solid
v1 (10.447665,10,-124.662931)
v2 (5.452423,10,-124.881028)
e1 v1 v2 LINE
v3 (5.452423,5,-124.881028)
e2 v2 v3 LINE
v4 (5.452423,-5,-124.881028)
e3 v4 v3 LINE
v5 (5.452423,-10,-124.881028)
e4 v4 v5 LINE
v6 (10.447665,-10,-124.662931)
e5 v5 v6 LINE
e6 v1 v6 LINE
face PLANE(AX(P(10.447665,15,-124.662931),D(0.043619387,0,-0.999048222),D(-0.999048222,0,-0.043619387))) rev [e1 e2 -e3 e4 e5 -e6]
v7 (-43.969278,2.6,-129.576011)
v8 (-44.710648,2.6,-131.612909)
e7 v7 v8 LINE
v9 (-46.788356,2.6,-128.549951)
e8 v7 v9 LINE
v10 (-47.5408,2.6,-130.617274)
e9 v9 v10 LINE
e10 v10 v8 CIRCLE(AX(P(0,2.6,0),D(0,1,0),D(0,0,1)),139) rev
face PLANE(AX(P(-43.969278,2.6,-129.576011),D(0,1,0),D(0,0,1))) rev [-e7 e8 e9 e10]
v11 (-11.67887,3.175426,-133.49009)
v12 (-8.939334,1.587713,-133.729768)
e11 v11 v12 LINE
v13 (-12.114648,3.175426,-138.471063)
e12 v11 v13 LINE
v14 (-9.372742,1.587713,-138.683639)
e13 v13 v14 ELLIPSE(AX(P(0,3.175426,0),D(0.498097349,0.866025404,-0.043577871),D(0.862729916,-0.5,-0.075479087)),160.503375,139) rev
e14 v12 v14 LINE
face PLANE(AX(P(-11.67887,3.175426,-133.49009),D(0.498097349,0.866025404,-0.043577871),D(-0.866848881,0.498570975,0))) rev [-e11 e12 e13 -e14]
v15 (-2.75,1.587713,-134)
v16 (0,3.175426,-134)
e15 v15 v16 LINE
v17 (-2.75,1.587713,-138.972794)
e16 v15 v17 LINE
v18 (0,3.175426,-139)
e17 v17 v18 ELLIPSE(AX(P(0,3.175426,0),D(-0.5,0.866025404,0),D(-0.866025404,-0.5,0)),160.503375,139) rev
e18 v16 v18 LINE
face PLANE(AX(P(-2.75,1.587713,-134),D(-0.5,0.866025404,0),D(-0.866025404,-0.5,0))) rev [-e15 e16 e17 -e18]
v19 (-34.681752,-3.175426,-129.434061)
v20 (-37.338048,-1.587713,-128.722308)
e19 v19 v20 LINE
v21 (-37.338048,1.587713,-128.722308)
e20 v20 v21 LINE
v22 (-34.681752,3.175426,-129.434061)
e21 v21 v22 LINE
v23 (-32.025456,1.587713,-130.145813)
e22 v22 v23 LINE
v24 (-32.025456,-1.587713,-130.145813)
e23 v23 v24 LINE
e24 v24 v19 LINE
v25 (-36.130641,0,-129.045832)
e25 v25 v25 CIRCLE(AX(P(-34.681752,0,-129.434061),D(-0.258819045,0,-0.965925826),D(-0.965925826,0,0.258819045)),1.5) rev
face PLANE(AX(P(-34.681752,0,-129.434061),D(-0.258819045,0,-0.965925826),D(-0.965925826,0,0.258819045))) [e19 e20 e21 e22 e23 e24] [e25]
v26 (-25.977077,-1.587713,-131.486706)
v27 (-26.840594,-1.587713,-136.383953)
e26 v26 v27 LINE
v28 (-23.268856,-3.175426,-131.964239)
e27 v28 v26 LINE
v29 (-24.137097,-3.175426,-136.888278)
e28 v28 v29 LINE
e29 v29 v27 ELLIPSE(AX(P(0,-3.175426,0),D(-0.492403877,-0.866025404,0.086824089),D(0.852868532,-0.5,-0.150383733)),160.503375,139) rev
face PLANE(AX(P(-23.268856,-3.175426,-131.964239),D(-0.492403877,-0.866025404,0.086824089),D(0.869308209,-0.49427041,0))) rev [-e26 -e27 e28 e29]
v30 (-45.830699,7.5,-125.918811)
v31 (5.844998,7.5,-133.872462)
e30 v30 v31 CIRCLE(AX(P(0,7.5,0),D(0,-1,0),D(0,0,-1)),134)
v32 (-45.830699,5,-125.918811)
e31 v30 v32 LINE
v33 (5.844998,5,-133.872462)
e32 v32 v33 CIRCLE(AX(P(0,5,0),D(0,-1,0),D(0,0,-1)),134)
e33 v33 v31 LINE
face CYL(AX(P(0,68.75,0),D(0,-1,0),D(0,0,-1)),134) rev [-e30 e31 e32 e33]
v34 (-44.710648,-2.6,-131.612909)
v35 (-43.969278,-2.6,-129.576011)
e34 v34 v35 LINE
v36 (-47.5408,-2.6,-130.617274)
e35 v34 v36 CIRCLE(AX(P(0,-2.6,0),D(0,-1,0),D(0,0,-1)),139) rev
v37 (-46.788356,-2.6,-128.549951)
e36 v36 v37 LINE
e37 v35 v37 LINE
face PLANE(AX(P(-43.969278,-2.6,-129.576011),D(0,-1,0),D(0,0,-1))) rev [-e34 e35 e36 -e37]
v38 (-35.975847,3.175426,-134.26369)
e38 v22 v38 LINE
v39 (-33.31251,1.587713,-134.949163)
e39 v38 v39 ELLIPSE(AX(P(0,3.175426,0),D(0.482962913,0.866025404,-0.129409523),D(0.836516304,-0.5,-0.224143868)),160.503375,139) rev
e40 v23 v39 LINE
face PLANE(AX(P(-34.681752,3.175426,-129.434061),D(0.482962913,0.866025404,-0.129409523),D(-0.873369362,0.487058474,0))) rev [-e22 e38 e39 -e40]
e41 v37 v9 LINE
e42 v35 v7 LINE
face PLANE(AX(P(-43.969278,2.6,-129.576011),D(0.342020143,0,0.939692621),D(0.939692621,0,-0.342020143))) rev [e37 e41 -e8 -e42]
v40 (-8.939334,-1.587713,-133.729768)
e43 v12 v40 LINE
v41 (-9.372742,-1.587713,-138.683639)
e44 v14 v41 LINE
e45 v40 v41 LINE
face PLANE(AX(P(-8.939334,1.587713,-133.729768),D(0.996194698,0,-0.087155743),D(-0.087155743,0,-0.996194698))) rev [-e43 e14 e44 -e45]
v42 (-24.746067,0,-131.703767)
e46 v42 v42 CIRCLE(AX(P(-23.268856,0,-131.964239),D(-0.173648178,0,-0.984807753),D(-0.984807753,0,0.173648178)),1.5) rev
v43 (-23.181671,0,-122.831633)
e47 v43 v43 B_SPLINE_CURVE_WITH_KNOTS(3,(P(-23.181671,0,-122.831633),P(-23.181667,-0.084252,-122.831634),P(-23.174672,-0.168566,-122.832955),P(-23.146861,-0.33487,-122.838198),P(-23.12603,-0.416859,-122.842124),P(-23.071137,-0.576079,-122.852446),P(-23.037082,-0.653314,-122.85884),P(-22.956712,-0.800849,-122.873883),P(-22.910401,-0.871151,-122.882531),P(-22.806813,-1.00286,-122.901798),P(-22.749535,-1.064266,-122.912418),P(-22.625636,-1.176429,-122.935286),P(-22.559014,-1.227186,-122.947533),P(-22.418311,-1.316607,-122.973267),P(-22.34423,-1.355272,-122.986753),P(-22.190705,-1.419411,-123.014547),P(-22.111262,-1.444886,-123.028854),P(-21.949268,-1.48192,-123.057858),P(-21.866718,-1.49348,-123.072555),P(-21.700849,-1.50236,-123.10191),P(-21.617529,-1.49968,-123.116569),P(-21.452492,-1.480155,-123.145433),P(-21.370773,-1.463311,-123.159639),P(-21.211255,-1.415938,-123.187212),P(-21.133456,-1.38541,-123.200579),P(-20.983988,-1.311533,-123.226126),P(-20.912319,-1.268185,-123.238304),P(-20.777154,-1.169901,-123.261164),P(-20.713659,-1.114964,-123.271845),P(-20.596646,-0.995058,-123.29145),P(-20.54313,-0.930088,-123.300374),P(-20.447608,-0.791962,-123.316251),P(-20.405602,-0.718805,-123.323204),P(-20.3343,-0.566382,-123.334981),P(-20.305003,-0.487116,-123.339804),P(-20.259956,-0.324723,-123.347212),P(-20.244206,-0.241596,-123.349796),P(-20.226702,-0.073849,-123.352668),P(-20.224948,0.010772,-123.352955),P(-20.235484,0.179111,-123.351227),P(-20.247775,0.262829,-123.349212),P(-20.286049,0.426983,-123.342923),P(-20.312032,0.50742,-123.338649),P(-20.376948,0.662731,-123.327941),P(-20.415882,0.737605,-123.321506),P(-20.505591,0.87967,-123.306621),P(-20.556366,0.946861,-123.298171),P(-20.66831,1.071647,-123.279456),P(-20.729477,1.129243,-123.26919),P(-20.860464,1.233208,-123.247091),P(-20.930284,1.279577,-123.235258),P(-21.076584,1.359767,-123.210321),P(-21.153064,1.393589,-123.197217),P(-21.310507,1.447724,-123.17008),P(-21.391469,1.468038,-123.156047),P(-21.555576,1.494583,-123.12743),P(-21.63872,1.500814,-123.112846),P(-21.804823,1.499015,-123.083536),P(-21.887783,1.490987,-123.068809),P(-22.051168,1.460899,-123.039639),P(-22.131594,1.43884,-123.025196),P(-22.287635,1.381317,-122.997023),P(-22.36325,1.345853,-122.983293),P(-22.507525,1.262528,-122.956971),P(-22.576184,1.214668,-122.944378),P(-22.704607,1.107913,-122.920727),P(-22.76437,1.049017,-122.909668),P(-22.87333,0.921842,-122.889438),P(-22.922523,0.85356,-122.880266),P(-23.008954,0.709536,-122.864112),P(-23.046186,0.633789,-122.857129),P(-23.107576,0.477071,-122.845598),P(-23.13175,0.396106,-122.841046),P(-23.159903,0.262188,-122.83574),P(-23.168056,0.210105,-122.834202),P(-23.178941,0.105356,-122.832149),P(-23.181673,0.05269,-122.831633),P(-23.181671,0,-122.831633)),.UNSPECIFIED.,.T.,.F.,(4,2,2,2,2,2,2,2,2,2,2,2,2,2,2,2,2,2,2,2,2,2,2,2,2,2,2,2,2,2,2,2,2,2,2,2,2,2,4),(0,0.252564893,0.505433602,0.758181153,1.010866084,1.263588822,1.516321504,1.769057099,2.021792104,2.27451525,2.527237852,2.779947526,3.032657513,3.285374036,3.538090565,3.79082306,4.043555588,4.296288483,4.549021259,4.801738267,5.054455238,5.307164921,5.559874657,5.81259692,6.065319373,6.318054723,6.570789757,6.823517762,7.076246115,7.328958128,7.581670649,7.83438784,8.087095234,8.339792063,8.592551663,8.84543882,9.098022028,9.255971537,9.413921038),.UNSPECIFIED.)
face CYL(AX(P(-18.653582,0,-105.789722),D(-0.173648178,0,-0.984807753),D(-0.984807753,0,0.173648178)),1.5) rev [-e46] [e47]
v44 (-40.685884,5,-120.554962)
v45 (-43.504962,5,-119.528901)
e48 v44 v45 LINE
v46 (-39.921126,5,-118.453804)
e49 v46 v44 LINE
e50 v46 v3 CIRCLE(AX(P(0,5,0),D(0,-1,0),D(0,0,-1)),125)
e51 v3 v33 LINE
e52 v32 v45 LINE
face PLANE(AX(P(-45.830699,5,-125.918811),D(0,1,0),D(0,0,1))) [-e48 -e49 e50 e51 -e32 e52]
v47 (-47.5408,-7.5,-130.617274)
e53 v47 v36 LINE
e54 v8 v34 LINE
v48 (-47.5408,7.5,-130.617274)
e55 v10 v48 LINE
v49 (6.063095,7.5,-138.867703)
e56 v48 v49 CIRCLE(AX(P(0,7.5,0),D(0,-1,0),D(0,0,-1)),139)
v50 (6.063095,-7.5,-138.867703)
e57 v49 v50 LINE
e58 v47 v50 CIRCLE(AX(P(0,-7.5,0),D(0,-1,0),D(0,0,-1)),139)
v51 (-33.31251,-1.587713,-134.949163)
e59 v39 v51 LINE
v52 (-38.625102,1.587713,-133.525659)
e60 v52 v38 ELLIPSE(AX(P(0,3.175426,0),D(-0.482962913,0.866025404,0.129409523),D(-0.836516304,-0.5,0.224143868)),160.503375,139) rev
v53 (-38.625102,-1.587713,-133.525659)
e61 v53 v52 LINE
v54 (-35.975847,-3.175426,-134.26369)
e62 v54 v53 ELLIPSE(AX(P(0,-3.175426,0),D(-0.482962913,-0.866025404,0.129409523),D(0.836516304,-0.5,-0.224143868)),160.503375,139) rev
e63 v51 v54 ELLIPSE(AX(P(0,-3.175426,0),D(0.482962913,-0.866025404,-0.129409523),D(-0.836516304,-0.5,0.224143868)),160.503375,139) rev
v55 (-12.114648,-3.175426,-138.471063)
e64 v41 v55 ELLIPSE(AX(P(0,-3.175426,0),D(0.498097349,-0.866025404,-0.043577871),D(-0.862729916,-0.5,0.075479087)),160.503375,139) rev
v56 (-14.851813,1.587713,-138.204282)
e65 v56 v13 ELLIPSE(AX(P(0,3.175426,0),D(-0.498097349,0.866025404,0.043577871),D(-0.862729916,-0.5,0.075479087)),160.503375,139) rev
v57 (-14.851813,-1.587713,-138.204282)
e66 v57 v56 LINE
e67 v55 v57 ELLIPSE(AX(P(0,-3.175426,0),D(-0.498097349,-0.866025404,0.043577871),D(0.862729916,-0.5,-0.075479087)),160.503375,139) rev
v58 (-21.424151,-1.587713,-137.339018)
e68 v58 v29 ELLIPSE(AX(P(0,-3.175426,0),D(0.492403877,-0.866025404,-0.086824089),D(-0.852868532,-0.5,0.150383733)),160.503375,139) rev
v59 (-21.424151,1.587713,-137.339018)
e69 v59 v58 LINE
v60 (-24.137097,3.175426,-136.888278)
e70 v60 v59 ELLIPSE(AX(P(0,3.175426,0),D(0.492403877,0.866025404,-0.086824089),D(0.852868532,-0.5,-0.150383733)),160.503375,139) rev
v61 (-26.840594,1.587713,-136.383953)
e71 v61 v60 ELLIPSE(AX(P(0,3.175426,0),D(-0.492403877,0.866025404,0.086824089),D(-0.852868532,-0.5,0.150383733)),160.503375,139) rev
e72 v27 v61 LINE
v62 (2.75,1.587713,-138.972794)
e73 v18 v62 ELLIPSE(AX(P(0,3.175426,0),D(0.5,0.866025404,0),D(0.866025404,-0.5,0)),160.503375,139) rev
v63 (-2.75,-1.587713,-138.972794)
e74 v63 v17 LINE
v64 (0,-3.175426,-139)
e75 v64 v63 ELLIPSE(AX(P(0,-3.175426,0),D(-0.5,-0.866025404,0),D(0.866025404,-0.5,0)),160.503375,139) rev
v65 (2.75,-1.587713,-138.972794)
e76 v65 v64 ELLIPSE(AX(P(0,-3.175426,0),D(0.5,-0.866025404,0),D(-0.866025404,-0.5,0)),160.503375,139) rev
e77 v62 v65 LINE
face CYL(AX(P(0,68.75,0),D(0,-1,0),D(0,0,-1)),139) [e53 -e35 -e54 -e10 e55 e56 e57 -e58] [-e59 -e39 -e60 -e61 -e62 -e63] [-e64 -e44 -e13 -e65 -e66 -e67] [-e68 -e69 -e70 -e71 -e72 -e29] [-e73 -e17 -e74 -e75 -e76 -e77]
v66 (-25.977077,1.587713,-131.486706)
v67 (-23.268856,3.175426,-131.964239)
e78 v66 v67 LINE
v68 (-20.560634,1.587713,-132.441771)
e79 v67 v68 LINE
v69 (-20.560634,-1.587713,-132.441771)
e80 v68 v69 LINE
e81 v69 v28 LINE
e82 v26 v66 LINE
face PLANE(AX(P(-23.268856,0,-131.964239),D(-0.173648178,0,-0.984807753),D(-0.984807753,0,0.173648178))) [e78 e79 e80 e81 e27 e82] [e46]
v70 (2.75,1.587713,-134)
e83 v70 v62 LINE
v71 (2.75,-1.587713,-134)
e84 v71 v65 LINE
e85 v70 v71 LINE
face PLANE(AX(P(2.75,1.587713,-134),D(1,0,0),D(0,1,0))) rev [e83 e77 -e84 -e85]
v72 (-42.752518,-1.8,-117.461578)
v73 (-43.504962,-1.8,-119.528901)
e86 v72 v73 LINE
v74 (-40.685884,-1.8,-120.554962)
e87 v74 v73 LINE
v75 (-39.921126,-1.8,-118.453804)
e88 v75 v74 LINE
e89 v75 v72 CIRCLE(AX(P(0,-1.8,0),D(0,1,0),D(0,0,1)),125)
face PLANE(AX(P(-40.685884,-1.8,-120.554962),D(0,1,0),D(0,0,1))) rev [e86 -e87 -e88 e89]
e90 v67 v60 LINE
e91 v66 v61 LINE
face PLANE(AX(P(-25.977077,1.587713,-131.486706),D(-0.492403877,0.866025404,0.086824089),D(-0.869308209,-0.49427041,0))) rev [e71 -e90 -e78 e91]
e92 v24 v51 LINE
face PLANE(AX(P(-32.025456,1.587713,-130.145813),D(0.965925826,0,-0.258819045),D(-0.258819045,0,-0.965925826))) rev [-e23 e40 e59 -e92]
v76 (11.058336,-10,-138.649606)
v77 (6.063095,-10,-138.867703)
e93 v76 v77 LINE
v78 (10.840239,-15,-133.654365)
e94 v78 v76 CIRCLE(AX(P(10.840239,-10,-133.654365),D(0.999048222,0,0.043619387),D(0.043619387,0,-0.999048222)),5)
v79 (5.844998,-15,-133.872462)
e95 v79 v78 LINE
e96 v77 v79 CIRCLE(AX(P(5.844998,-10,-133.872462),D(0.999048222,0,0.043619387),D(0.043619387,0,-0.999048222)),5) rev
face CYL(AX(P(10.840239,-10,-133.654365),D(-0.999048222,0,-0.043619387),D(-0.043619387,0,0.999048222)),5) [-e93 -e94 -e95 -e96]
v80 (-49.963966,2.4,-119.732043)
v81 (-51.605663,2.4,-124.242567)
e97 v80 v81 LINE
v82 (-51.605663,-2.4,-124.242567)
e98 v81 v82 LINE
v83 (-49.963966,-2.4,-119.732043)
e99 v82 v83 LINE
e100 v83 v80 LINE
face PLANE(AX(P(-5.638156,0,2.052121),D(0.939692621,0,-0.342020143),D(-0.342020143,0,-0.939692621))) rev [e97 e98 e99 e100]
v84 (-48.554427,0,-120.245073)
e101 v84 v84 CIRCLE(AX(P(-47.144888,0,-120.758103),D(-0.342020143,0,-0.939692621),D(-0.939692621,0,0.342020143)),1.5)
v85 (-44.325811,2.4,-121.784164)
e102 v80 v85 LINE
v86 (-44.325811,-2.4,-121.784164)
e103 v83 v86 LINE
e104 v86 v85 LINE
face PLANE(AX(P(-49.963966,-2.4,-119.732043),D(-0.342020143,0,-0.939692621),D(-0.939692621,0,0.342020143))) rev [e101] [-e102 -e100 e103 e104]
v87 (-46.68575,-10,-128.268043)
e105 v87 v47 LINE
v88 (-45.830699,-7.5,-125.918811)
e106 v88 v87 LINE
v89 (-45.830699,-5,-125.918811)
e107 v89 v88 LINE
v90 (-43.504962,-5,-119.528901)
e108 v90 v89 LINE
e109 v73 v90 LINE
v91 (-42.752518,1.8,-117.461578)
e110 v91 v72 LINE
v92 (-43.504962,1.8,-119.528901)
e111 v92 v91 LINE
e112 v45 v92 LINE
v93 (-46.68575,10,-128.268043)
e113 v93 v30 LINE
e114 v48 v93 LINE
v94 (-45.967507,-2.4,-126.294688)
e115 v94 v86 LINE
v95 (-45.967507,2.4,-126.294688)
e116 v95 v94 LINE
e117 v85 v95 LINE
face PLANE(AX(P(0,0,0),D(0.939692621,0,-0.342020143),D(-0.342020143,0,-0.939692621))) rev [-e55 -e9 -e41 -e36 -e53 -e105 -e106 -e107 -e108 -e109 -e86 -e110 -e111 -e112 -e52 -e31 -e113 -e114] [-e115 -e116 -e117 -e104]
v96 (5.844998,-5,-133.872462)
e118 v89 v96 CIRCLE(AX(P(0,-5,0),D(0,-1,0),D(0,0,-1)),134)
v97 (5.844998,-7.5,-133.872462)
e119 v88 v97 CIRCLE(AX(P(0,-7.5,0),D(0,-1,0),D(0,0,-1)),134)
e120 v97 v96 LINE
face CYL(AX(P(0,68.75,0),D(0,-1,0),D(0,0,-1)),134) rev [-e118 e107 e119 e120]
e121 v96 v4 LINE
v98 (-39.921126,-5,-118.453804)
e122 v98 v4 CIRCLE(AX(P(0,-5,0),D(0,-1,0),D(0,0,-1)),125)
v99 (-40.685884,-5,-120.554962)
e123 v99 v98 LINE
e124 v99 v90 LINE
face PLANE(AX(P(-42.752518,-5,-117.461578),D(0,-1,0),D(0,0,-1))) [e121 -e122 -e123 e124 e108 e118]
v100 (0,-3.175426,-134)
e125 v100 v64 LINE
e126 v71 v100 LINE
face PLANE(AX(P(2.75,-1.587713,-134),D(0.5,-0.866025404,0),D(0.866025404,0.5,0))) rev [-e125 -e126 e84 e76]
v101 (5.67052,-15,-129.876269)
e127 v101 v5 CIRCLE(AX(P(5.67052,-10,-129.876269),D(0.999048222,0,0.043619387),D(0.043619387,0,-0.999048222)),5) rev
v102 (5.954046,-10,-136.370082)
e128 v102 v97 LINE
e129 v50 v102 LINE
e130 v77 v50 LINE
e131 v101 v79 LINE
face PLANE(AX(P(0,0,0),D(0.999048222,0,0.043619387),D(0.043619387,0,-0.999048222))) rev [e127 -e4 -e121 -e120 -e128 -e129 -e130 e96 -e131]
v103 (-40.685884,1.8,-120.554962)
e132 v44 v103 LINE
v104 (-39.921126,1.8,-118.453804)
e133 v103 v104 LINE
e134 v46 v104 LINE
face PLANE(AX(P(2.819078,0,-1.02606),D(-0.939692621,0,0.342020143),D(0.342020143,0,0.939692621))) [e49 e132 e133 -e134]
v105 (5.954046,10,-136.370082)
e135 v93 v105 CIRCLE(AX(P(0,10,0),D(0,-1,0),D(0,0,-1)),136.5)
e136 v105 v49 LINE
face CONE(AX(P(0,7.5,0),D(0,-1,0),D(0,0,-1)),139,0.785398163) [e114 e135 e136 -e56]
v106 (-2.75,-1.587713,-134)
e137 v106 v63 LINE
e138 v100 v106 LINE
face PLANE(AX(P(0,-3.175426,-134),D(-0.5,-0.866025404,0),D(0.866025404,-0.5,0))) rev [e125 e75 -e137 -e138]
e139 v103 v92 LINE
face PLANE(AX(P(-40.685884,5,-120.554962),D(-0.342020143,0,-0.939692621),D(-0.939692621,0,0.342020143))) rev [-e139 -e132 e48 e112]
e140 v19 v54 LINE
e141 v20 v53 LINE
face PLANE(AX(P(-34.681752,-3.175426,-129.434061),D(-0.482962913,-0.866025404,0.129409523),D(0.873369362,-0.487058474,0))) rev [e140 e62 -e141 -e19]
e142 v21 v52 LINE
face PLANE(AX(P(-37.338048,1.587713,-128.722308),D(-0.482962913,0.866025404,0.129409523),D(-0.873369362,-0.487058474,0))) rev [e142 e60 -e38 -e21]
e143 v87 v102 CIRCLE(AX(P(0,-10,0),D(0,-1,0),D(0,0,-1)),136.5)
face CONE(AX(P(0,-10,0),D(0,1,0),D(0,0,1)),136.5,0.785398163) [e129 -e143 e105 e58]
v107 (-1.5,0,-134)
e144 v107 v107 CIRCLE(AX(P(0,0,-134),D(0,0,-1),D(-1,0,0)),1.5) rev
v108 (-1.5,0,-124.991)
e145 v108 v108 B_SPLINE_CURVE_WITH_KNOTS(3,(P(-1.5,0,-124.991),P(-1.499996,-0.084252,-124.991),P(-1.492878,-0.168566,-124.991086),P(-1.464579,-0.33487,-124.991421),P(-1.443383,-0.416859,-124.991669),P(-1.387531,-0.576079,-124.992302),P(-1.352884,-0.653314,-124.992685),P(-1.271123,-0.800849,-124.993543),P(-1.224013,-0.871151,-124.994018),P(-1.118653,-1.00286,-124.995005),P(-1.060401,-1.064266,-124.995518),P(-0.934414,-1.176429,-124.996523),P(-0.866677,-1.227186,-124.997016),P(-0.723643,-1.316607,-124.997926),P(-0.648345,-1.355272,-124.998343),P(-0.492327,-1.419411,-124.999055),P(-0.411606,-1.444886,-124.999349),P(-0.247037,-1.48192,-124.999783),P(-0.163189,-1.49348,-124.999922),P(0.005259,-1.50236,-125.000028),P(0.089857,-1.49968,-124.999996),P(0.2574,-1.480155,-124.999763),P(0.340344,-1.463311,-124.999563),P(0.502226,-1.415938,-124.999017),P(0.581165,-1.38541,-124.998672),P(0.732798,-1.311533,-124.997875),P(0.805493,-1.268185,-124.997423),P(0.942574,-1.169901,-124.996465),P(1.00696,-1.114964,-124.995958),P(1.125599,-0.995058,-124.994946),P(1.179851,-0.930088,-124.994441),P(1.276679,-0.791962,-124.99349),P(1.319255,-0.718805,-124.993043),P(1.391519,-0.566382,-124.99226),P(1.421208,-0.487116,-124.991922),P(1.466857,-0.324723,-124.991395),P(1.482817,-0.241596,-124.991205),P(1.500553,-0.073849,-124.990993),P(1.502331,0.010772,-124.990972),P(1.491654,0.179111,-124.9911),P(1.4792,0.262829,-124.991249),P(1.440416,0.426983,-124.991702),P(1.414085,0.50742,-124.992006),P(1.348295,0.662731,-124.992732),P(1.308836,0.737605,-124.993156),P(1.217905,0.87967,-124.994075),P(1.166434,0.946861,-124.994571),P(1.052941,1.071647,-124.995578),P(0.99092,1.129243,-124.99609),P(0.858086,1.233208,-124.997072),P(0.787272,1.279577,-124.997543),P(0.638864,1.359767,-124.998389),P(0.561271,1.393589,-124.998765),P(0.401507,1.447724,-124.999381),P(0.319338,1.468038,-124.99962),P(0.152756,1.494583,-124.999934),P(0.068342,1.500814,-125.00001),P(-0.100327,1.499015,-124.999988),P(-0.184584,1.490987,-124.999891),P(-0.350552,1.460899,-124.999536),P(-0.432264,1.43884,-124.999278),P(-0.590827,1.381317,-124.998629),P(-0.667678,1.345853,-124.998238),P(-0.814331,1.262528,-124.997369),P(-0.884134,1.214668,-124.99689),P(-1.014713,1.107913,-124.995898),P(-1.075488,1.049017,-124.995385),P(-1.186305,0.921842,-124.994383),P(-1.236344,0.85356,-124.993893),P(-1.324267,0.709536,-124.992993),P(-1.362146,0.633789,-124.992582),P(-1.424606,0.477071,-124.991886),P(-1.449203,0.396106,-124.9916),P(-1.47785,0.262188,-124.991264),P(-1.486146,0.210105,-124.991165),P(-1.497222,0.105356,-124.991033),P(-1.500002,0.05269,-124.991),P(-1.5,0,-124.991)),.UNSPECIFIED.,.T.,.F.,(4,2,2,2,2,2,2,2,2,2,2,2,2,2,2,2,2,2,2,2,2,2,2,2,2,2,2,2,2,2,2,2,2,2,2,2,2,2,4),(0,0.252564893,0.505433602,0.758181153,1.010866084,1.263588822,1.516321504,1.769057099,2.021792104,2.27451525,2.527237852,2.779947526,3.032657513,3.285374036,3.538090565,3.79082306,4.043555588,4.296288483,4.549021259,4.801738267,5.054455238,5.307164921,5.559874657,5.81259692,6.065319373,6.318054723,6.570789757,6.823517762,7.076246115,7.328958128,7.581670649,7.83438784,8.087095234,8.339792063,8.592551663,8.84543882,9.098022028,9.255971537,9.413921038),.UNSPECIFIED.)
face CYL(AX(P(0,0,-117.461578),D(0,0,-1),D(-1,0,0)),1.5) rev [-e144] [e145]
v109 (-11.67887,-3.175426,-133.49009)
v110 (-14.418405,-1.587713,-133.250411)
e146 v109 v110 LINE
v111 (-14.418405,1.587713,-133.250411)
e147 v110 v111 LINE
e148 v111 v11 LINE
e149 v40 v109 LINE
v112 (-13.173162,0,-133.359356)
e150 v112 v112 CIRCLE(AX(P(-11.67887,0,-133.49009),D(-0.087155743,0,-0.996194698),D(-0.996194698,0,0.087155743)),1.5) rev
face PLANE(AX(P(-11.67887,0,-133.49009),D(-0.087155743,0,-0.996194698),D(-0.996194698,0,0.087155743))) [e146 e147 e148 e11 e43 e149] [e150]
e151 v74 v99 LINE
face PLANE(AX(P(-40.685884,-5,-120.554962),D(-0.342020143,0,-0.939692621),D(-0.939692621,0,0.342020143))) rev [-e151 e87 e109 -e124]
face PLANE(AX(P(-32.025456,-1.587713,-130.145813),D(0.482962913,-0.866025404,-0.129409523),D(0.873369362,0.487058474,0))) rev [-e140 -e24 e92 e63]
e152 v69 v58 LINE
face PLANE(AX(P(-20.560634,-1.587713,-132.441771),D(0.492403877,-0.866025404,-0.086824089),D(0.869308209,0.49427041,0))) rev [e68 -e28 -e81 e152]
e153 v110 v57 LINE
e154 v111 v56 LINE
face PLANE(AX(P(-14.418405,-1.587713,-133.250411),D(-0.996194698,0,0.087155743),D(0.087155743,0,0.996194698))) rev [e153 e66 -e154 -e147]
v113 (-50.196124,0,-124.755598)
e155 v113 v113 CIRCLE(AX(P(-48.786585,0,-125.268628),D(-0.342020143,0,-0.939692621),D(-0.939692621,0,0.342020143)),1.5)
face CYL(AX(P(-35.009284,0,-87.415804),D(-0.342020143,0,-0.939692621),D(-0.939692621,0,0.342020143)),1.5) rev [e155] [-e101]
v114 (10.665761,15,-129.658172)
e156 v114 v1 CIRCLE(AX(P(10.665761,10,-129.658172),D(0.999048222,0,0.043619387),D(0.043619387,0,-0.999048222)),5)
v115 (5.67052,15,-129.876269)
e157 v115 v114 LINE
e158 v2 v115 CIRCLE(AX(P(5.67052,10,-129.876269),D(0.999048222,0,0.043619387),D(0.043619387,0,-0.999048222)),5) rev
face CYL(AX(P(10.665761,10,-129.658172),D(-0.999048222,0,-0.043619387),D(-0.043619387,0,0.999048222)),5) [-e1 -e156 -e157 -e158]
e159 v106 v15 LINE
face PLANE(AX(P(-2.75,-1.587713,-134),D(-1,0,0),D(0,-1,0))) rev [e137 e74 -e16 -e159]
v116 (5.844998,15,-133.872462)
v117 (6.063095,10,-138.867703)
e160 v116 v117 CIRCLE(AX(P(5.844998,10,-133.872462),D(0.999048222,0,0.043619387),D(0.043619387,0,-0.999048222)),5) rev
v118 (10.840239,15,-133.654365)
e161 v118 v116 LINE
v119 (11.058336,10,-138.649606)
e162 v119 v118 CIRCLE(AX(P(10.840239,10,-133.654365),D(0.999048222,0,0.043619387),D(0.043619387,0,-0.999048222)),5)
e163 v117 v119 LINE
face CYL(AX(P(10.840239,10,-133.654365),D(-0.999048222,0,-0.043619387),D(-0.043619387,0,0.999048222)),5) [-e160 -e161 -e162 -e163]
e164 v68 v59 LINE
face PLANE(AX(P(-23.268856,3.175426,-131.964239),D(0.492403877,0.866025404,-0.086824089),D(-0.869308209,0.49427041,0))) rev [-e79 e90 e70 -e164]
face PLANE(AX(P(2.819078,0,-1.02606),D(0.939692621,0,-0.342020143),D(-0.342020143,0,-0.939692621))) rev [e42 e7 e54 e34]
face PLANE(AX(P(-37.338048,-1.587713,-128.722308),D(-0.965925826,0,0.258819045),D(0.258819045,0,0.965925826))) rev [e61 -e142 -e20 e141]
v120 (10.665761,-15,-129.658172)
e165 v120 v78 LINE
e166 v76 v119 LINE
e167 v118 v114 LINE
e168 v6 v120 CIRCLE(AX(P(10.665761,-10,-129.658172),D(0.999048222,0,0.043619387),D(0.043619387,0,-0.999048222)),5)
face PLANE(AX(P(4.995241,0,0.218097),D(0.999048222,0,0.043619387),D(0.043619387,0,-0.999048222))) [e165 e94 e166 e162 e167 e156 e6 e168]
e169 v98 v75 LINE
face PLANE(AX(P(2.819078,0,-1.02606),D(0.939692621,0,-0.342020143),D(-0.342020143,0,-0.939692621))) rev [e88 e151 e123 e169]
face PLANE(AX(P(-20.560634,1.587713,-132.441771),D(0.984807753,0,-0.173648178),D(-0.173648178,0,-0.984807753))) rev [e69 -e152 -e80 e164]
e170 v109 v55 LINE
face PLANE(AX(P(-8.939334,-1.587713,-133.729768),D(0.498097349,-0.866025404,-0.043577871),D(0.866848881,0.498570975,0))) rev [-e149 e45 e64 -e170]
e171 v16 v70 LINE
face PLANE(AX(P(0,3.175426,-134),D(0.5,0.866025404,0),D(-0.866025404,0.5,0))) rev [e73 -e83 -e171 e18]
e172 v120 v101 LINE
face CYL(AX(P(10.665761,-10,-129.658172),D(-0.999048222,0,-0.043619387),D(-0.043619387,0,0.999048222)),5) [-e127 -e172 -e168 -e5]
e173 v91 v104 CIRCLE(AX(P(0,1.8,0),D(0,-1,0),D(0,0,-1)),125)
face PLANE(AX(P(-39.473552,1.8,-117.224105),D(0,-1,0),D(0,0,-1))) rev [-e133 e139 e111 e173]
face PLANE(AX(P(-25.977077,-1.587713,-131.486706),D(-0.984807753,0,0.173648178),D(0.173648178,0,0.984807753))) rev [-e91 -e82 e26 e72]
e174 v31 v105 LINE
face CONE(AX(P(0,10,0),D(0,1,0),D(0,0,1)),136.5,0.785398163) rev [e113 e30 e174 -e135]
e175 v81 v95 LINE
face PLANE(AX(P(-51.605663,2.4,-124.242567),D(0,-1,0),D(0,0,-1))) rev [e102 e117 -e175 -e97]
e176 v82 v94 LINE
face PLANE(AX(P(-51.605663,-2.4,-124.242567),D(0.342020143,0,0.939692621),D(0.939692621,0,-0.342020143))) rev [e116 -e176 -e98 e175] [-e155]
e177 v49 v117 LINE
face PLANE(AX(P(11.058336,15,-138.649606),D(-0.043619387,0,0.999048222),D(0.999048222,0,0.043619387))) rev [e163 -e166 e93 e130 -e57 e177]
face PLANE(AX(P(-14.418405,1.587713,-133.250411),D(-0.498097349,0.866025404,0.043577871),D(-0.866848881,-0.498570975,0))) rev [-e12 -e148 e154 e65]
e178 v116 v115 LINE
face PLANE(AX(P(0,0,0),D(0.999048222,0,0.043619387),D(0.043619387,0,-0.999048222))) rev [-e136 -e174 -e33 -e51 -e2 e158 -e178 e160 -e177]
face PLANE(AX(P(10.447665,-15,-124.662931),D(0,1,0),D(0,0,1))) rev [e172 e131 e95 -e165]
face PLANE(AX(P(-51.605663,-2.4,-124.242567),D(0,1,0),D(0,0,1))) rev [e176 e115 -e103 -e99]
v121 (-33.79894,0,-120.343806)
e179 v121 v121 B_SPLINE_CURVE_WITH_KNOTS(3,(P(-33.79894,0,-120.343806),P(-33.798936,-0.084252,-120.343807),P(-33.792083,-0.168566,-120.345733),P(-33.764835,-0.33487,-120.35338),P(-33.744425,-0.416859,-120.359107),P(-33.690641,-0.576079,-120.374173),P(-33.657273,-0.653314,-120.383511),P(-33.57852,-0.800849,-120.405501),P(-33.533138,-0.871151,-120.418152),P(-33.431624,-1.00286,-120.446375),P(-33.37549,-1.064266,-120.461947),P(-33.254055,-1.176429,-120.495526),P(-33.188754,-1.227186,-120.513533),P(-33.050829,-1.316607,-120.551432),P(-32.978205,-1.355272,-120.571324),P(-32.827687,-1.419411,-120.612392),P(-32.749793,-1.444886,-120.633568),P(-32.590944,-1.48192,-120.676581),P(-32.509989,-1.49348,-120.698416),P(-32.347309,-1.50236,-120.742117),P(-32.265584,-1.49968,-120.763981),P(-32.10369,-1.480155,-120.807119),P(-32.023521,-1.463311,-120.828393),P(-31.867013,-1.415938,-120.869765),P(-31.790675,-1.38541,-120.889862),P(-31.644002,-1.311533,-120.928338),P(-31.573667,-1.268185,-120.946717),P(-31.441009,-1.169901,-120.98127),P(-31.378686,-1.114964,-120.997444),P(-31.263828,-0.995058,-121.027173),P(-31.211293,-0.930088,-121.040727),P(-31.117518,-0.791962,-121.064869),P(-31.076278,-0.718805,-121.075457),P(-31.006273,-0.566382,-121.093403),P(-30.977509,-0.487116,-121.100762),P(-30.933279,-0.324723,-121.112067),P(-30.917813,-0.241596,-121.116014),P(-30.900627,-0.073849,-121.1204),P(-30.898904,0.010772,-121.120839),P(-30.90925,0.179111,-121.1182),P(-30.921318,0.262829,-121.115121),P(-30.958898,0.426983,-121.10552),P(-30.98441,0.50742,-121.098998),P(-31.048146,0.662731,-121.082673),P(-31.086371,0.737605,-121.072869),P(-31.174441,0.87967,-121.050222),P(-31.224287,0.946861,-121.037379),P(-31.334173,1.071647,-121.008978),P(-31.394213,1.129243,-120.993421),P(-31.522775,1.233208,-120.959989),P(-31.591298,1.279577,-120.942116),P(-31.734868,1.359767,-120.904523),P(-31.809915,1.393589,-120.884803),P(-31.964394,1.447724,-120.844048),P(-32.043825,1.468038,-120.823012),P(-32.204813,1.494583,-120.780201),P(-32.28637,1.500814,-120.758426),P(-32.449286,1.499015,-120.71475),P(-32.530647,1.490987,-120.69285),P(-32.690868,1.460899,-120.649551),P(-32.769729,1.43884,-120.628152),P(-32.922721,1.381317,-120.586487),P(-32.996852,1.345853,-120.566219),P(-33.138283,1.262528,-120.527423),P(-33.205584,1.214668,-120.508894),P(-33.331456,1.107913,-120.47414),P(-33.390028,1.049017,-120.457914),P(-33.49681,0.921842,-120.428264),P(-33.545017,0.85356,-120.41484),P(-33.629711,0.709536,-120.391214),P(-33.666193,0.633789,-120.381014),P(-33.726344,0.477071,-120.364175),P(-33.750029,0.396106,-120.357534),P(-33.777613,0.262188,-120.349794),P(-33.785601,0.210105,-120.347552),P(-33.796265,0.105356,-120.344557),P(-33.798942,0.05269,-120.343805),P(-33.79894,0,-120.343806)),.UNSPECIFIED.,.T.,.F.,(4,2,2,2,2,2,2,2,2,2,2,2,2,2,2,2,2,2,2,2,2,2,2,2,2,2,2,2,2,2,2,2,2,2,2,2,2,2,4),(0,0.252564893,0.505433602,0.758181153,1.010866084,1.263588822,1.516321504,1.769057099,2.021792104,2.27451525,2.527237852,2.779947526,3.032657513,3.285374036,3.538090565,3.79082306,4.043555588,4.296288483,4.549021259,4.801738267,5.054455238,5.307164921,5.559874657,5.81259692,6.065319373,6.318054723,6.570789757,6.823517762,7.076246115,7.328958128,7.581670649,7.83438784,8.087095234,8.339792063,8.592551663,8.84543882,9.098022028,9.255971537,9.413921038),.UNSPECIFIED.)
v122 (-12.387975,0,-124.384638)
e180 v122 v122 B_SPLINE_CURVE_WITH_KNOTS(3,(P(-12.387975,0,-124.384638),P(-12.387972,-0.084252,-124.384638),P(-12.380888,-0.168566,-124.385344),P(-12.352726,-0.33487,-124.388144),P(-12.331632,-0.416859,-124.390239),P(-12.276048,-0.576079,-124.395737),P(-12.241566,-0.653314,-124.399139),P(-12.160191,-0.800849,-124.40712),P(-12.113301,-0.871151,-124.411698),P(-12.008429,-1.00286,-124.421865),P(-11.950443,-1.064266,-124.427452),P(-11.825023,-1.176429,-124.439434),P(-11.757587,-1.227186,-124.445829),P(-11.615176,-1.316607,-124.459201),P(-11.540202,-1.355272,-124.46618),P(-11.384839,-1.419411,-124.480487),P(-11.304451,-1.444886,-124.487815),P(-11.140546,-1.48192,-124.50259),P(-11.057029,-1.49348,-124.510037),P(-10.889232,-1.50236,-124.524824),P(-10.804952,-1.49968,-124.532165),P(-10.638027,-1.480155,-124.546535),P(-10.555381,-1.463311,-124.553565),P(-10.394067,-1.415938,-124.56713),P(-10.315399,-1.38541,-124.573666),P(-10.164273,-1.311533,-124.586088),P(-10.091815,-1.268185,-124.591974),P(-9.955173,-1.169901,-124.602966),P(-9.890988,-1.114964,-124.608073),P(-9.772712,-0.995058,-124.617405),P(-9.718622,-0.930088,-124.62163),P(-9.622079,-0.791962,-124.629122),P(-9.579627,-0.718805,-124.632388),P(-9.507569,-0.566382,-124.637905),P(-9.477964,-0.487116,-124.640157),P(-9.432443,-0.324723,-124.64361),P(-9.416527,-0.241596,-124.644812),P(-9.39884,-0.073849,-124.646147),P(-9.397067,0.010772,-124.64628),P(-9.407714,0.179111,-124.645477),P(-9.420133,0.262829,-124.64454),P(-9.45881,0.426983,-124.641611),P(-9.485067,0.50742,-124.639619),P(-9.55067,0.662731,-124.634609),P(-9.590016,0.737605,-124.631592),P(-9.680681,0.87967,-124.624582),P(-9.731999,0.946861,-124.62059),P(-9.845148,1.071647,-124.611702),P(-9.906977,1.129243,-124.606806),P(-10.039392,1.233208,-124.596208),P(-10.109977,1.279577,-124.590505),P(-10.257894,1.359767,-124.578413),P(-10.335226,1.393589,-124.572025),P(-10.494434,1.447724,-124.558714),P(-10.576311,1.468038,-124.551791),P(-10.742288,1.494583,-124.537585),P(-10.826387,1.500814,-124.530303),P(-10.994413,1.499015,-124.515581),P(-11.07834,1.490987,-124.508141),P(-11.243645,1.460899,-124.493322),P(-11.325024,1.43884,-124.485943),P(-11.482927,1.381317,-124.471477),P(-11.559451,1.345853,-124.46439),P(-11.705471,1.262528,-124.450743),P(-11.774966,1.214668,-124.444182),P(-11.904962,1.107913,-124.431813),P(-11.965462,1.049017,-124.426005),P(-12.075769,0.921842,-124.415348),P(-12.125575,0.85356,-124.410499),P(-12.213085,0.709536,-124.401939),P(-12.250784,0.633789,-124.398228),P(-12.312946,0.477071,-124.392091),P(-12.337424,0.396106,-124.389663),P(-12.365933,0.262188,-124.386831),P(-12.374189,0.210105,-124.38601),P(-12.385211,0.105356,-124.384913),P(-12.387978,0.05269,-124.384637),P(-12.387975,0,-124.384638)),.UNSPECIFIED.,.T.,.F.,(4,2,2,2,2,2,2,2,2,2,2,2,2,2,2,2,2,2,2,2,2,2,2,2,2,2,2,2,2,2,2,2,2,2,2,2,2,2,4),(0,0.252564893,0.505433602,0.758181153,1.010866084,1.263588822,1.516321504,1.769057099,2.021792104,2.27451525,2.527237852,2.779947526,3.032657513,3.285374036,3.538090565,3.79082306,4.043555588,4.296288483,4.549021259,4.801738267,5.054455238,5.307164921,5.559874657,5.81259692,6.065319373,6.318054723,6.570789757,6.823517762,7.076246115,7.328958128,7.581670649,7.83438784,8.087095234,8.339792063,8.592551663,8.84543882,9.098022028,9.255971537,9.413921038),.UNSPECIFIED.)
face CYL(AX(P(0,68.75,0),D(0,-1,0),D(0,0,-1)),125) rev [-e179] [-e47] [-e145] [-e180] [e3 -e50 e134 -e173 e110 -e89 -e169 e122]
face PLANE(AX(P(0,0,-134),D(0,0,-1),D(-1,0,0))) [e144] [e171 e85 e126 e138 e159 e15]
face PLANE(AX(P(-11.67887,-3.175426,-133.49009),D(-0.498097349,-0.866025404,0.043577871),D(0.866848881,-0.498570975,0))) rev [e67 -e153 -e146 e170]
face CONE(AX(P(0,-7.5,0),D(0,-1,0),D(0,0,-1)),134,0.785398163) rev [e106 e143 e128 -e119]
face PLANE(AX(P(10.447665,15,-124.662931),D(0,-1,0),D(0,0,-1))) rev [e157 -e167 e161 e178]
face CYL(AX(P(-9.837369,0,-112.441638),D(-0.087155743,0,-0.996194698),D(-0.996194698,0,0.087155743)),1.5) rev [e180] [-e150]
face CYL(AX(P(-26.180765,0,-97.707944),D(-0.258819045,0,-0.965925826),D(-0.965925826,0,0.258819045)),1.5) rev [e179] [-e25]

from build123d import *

# Parameters (mm, degrees)
REVOLVE_1_ANGLE          = 40
SKETCH_4_W               = 4.8
SKETCH_4_H               = 4.8
EXTRUDE_1_DEPTH          = 6
SKETCH_7_R               = 1.5
CUT_EXTRUDE_4_DEPTH      = 95.895882206
SKETCH_13_R              = 1.5
CUT_EXTRUDE_7_DEPTH      = 57.80711304
CUT_EXTRUDE_8_DEPTH      = 5
PATTERN_CIRCULAR_1_COUNT = 4
PATTERN_CIRCULAR_1_ANGLE = 15
SKETCH_10_W              = 2.2
SKETCH_10_H              = 5.2
CUT_EXTRUDE_5_DEPTH      = 3
SKETCH_11_W              = 47.375376564
SKETCH_11_H              = 32.407082742
CUT_EXTRUDE_6_DEPTH      = 149.607349927
SKETCH_12_W              = 14
SKETCH_12_H              = 30
EXTRUDE_2_DEPTH          = 5
FILLET_1_R               = 5


# Read off the part's stored shape, not the designer's step: 旋转1
with BuildPart() as part:
    # 旋转1 outline → 旋转1 (revolve)
    with BuildSketch(Plane(origin=(0, 0, 0), x_dir=(0.3420201433256701, 0, -0.9396926207859079), z_dir=(0.9396926207859079, 0, 0.3420201433256701))):
        Polygon((134, 5), (125, 5), (125, -5), (134, -5), (134, -7.5), (136.5, -10), (139, -7.5), (139, 7.5), (136.5, 10), (134, 7.5), align=None)
    revolve(axis=Axis((0, 0, 0), (0, 1, 0)), revolution_arc=REVOLVE_1_ANGLE)

    # 草图4 → 凸台-拉伸1 (add)
    with BuildSketch(Plane(origin=(0, 0, 0), x_dir=(0.3420201433256631, 0, 0.9396926207859104), z_dir=(-0.9396926207859104, 0, 0.3420201433256631))):
        with Locations((-132, 0)):
            Rectangle(SKETCH_4_W, SKETCH_4_H)
    extrude(amount=EXTRUDE_1_DEPTH)

    # 草图7 → 切除-拉伸4 (cut, through all)
    with BuildSketch(Plane(origin=(-45.967507263, 0, -126.294688234), x_dir=(-0.9396926207859105, 0, 0.3420201433256632), z_dir=(-0.3420201433256632, 0, -0.9396926207859105))):
        with Locations((3, 0)):
            Circle(SKETCH_7_R)
    extrude(amount=-CUT_EXTRUDE_4_DEPTH, mode=Mode.SUBTRACT)

    # 草图13 → 切除-拉伸7 (cut, through all)
    with BuildSketch(Plane(origin=(0, 0, -139), x_dir=(-1, 0, 0), z_dir=(0, 0, -1))):
        Circle(SKETCH_13_R)
    cut_extrude_7 = extrude(amount=-CUT_EXTRUDE_7_DEPTH, mode=Mode.SUBTRACT)

    # 草图14 → 切除-拉伸8 (cut)
    with BuildSketch(Plane(origin=(0, 0, -139), x_dir=(-1, 0, 0), z_dir=(0, 0, -1))):
        Polygon((0, -3.175426481), (2.75, -1.58771324), (2.75, 1.58771324), (0, 3.175426481), (-2.75, 1.58771324), (-2.75, -1.58771324), align=None)
    cut_extrude_8 = extrude(amount=-CUT_EXTRUDE_8_DEPTH, mode=Mode.SUBTRACT)

    # 阵列(圆周)1: 切除-拉伸7, 切除-拉伸8 ×4 about axis
    pattern_circular_1_axis = Axis((0, 0, 0), (0, 1, 0))
    add([cut_extrude_7.rotate(pattern_circular_1_axis, i * PATTERN_CIRCULAR_1_ANGLE / (PATTERN_CIRCULAR_1_COUNT - 1)) for i in range(1, PATTERN_CIRCULAR_1_COUNT)], mode=Mode.SUBTRACT)
    add([cut_extrude_8.rotate(pattern_circular_1_axis, i * PATTERN_CIRCULAR_1_ANGLE / (PATTERN_CIRCULAR_1_COUNT - 1)) for i in range(1, PATTERN_CIRCULAR_1_COUNT)], mode=Mode.SUBTRACT)

    # 草图10 → 切除-拉伸5 (cut)
    with BuildSketch(Plane(origin=(0, 0, 0), x_dir=(0.3420201433256631, 0, 0.9396926207859104), z_dir=(-0.9396926207859104, 0, 0.3420201433256631))):
        with Locations((-137.9, 0)):
            Rectangle(SKETCH_10_W, SKETCH_10_H)
        Polygon((-127.2, 5), (-125, 5), (-123.655375964, 5), (-123.655375964, 1.8), (-125, 1.8), (-127.2, 1.8), align=None)
        Polygon((-127.2, -1.8), (-125, -1.8), (-123.655375964, -1.8), (-123.655375964, -5), (-125, -5), (-127.2, -5), align=None)
    extrude(amount=-CUT_EXTRUDE_5_DEPTH, mode=Mode.SUBTRACT)

    # 草图11 → 切除-拉伸6 (cut, through all)
    with BuildSketch(Plane(origin=(0, 0, 0), x_dir=(0, -1, 0), z_dir=(0.9990482215818578, 0, 0.0436193873653361))):
        with Locations((-1.017262687, 125.577370773)):
            Rectangle(SKETCH_11_W, SKETCH_11_H)
    extrude(amount=CUT_EXTRUDE_6_DEPTH, mode=Mode.SUBTRACT)

    # 草图12 → 凸台-拉伸2 (add)
    with BuildSketch(Plane(origin=(0, 0, 0), x_dir=(0.043619387365336125, 0, -0.9990482215818578), z_dir=(0.9990482215818577, 0, 0.04361938736533612))):
        with Locations((132, 0)):
            Rectangle(SKETCH_12_W, SKETCH_12_H)
    extrude(amount=EXTRUDE_2_DEPTH)

    # 圆角1
    fillet_1_edges = [part.edges().sort_by_distance(p)[0] for p in [
        (7.950043975, 15, -124.771979229),
        (7.950043975, -15, -124.771979229),
        (8.560715398, -15, -138.758654331),
        (8.560715398, 15, -138.758654331),
    ]]
    fillet(fillet_1_edges, radius=FILLET_1_R)


solid = part.part
